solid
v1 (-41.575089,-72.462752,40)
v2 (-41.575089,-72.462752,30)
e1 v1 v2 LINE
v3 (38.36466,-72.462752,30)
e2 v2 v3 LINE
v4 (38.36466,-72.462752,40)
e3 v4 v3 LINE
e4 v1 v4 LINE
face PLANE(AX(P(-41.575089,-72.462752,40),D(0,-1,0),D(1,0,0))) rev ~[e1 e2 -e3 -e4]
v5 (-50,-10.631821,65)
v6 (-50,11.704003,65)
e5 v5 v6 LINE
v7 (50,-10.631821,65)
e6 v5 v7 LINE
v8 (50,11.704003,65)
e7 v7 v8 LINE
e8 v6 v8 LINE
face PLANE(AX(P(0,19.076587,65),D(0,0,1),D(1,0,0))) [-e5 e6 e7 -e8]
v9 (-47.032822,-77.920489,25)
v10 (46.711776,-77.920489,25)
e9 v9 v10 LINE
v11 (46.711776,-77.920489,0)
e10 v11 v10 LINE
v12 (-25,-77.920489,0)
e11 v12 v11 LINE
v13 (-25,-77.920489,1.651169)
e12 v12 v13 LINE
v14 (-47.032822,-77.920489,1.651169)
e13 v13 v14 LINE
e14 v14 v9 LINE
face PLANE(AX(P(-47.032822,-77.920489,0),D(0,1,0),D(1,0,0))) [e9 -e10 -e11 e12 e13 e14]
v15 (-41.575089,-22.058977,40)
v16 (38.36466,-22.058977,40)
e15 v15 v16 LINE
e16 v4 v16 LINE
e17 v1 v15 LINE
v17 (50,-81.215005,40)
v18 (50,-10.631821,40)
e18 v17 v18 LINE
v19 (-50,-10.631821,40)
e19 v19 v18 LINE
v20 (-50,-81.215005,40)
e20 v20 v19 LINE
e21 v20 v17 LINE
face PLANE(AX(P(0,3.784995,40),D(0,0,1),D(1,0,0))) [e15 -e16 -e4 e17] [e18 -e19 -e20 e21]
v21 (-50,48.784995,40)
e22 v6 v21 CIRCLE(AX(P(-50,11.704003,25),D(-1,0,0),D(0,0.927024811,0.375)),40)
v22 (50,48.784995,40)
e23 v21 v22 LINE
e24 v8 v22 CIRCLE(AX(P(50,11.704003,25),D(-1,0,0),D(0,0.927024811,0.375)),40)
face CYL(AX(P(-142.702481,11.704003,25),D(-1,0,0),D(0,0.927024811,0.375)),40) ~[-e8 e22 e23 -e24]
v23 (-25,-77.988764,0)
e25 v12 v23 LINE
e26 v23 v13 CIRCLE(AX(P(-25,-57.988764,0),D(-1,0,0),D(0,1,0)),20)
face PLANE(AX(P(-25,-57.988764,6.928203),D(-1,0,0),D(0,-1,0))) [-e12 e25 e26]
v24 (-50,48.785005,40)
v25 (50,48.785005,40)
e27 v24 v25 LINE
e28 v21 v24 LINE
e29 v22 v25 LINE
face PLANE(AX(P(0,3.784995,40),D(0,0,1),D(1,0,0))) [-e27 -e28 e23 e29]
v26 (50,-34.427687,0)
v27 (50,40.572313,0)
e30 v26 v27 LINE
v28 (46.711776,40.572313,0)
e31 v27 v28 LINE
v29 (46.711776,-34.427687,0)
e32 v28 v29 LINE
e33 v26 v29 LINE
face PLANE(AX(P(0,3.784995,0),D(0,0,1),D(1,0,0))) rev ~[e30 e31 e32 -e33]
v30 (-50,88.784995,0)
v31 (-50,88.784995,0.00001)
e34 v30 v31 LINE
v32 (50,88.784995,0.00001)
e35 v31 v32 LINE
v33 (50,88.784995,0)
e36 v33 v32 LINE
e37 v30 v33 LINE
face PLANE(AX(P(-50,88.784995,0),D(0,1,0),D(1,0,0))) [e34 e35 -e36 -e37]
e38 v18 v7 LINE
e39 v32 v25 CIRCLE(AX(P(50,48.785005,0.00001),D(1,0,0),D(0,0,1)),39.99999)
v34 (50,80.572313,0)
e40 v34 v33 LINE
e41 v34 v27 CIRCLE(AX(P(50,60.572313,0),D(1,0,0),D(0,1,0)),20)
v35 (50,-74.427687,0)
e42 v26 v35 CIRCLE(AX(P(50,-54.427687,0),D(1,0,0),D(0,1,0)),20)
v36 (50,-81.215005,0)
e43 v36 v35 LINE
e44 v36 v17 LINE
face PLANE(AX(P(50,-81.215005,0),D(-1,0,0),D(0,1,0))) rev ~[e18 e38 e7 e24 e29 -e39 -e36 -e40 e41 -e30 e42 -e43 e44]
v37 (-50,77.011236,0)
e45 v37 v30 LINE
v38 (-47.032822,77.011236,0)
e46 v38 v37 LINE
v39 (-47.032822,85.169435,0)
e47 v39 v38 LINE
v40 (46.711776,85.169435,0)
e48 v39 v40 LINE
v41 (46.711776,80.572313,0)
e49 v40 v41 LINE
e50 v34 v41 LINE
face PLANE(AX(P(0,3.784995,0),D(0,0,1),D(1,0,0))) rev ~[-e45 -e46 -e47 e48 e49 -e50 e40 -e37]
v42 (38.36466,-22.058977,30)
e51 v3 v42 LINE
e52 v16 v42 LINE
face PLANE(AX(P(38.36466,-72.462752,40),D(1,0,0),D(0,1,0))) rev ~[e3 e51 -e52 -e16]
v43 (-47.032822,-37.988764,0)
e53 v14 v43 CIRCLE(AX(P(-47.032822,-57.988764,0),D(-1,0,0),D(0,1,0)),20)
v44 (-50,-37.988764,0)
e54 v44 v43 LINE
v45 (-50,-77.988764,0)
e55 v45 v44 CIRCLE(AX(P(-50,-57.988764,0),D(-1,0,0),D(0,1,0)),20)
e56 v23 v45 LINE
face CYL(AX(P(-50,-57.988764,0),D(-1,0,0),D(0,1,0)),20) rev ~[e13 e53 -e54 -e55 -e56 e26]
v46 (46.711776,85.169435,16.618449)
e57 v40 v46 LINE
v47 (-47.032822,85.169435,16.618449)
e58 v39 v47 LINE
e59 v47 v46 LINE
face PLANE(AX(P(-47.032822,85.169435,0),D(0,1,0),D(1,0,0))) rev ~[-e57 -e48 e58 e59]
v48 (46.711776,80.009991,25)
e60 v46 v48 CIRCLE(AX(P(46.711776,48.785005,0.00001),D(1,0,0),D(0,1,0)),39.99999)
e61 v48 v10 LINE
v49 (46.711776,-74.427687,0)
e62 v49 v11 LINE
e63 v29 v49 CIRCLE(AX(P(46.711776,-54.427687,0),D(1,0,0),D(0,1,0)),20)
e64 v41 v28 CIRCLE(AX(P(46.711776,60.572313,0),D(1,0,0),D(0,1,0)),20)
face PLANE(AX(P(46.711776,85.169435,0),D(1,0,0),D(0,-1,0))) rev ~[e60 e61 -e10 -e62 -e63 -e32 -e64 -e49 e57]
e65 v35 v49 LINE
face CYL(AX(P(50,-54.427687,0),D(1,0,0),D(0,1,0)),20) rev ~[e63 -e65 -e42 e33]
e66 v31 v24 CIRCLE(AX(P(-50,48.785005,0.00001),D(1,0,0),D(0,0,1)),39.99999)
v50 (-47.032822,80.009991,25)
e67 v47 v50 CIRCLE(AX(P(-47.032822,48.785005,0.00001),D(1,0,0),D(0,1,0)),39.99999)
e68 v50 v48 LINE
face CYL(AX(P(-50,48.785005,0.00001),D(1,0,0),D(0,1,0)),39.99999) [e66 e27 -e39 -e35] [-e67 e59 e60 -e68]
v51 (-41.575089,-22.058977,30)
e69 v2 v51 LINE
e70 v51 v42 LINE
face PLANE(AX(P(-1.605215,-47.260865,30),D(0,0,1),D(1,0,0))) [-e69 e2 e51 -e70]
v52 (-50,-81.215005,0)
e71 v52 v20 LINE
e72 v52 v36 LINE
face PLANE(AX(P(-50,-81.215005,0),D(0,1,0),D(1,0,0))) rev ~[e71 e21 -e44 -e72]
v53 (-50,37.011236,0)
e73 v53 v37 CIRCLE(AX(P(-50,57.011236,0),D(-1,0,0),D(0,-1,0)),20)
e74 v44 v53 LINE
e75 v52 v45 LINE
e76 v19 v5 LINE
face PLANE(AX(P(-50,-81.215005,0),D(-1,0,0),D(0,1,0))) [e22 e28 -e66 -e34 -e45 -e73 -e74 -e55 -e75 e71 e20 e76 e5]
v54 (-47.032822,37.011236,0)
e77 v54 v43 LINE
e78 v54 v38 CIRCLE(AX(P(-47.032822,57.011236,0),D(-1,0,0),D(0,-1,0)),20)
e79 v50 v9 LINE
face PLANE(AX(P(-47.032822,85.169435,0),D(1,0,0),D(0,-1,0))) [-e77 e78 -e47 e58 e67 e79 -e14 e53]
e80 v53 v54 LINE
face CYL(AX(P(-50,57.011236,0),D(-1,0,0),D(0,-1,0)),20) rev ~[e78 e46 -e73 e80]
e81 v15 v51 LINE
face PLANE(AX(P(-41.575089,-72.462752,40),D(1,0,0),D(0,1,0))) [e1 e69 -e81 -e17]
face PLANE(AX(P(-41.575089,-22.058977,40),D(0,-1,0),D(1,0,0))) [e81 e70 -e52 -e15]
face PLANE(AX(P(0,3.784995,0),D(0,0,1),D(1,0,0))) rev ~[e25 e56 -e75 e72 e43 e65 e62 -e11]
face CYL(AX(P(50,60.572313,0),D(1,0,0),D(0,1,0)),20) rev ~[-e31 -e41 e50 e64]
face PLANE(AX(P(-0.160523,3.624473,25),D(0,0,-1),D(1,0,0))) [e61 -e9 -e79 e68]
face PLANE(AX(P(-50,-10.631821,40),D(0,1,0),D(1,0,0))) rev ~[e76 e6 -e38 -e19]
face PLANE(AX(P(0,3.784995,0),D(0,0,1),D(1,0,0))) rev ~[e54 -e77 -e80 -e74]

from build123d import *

# Parameters (mm, degrees)
F0_W        = 100
F0_H        = 170
F1_DEPTH    = 40
F2_R        = 39.99999
F3_W        = 100
F3_H        = 59.416816481
F4_DEPTH    = 25
F5_T1_DEPTH = 285.4049621774
F7_DEPTH    = 25
F8_W        = 93.7445983291
F8_H        = 163.0899235606
F9_DEPTH    = 25
F11_DEPTH   = 25
F12_W       = 79.9397490919
F12_H       = 50.4037756473
F13_DEPTH   = 10


# Not quite as in the source:
# - a fillet or chamfer that OpenCascade refuses, or shapes differently, is made with other operations: its cross-section is extruded or revolved along the edge and cut away or added
# - a fillet or chamfer is up to 0.001 mm smaller than in the source, because OpenCascade refuses the exact size


with BuildPart() as f1:
    # F0 (on Top) → F1 (new body)
    with BuildSketch(Plane.XY):
        with Locations((0, 3.7849953254)):
            Rectangle(F0_W, F0_H)
    extrude(amount=F1_DEPTH)

    # F2 (radius 40 in the source; OpenCascade refuses exactly that, so slightly less here)
    f2_edges = [f1.edges().sort_by_distance(p)[0] for p in [
        (0, 88.784995, 40),
    ]]
    fillet(f2_edges, radius=F2_R)

    # F3 (on face) → F4 (join)
    with BuildSketch(Plane.XY.offset(40)):
        with Locations((0, 19.0765870849)):
            Rectangle(F3_W, F3_H)
    extrude(amount=F4_DEPTH)

    # F5: fillet of radius 40 on 1 edges, made by hand

    # F5_s2 → F5_t1 (cut)
    with BuildSketch(Plane.YZ.offset(-142.7024810887)):
        with BuildLine():
            ThreePointArc((48.7849953254, 40), (34.0646826649, 58.1662479036), (11.7040028899, 65))
            Line((11.7040028899, 65), (48.7849953254, 65))
            Line((48.7849953254, 65), (48.7849953254, 40))
        make_face()
    extrude(amount=F5_T1_DEPTH, mode=Mode.SUBTRACT)

    # F6 (on face) → F7 (cut)
    with BuildSketch(Plane.YZ.offset(50)):
        with BuildLine():
            Line((-74.4276870787, 0), (-34.4276870787, 0))
            ThreePointArc((-34.4276870787, 0), (-54.4276870787, 20), (-74.4276870787, 0))
        make_face()
        with BuildLine():
            ThreePointArc((80.5723129213, 0), (60.5723129213, 20), (40.5723129213, 0))
            Line((40.5723129213, 0), (80.5723129213, 0))
        make_face()
    extrude(amount=-F7_DEPTH, mode=Mode.SUBTRACT)

    # F8 (on face) → F9 (cut)
    with BuildSketch(Plane(origin=(0, 0, 0), x_dir=(1, 0, 0), z_dir=(0, 0, -1))):
        with Locations((-0.160522759, -3.6244727671)):
            Rectangle(F8_W, F8_H)
    extrude(amount=-F9_DEPTH, mode=Mode.SUBTRACT)

    # F10 (on face) → F11 (cut)
    with BuildSketch(Plane(origin=(-50, 0, 0), x_dir=(0, -1, 0), z_dir=(-1, 0, 0))):
        with BuildLine():
            ThreePointArc((-77.0112355053, 0), (-57.0112355053, -20), (-37.0112355053, 0))
            Line((-37.0112355053, 0), (-77.0112355053, 0))
        make_face()
        with BuildLine():
            ThreePointArc((77.9887644947, 0), (57.9887644947, 20), (37.9887644947, 0))
            Line((37.9887644947, 0), (77.9887644947, 0))
        make_face()
        with BuildLine():
            Line((-77.0112355053, 0), (-37.0112355053, 0))
            ThreePointArc((-37.0112355053, 0), (-57.0112355053, 20), (-77.0112355053, 0))
        make_face()
        with BuildLine():
            Line((77.9887644947, 0), (37.9887644947, 0))
            ThreePointArc((37.9887644947, 0), (57.9887644947, -20), (77.9887644947, 0))
        make_face()
    extrude(amount=-F11_DEPTH, mode=Mode.SUBTRACT)

    # F12 (on face) → F13 (cut)
    with BuildSketch(Plane.XY.offset(40)):
        with Locations((-1.6052145511, -47.2608646378)):
            Rectangle(F12_W, F12_H)
    extrude(amount=-F13_DEPTH, mode=Mode.SUBTRACT)


solid = f1.part
